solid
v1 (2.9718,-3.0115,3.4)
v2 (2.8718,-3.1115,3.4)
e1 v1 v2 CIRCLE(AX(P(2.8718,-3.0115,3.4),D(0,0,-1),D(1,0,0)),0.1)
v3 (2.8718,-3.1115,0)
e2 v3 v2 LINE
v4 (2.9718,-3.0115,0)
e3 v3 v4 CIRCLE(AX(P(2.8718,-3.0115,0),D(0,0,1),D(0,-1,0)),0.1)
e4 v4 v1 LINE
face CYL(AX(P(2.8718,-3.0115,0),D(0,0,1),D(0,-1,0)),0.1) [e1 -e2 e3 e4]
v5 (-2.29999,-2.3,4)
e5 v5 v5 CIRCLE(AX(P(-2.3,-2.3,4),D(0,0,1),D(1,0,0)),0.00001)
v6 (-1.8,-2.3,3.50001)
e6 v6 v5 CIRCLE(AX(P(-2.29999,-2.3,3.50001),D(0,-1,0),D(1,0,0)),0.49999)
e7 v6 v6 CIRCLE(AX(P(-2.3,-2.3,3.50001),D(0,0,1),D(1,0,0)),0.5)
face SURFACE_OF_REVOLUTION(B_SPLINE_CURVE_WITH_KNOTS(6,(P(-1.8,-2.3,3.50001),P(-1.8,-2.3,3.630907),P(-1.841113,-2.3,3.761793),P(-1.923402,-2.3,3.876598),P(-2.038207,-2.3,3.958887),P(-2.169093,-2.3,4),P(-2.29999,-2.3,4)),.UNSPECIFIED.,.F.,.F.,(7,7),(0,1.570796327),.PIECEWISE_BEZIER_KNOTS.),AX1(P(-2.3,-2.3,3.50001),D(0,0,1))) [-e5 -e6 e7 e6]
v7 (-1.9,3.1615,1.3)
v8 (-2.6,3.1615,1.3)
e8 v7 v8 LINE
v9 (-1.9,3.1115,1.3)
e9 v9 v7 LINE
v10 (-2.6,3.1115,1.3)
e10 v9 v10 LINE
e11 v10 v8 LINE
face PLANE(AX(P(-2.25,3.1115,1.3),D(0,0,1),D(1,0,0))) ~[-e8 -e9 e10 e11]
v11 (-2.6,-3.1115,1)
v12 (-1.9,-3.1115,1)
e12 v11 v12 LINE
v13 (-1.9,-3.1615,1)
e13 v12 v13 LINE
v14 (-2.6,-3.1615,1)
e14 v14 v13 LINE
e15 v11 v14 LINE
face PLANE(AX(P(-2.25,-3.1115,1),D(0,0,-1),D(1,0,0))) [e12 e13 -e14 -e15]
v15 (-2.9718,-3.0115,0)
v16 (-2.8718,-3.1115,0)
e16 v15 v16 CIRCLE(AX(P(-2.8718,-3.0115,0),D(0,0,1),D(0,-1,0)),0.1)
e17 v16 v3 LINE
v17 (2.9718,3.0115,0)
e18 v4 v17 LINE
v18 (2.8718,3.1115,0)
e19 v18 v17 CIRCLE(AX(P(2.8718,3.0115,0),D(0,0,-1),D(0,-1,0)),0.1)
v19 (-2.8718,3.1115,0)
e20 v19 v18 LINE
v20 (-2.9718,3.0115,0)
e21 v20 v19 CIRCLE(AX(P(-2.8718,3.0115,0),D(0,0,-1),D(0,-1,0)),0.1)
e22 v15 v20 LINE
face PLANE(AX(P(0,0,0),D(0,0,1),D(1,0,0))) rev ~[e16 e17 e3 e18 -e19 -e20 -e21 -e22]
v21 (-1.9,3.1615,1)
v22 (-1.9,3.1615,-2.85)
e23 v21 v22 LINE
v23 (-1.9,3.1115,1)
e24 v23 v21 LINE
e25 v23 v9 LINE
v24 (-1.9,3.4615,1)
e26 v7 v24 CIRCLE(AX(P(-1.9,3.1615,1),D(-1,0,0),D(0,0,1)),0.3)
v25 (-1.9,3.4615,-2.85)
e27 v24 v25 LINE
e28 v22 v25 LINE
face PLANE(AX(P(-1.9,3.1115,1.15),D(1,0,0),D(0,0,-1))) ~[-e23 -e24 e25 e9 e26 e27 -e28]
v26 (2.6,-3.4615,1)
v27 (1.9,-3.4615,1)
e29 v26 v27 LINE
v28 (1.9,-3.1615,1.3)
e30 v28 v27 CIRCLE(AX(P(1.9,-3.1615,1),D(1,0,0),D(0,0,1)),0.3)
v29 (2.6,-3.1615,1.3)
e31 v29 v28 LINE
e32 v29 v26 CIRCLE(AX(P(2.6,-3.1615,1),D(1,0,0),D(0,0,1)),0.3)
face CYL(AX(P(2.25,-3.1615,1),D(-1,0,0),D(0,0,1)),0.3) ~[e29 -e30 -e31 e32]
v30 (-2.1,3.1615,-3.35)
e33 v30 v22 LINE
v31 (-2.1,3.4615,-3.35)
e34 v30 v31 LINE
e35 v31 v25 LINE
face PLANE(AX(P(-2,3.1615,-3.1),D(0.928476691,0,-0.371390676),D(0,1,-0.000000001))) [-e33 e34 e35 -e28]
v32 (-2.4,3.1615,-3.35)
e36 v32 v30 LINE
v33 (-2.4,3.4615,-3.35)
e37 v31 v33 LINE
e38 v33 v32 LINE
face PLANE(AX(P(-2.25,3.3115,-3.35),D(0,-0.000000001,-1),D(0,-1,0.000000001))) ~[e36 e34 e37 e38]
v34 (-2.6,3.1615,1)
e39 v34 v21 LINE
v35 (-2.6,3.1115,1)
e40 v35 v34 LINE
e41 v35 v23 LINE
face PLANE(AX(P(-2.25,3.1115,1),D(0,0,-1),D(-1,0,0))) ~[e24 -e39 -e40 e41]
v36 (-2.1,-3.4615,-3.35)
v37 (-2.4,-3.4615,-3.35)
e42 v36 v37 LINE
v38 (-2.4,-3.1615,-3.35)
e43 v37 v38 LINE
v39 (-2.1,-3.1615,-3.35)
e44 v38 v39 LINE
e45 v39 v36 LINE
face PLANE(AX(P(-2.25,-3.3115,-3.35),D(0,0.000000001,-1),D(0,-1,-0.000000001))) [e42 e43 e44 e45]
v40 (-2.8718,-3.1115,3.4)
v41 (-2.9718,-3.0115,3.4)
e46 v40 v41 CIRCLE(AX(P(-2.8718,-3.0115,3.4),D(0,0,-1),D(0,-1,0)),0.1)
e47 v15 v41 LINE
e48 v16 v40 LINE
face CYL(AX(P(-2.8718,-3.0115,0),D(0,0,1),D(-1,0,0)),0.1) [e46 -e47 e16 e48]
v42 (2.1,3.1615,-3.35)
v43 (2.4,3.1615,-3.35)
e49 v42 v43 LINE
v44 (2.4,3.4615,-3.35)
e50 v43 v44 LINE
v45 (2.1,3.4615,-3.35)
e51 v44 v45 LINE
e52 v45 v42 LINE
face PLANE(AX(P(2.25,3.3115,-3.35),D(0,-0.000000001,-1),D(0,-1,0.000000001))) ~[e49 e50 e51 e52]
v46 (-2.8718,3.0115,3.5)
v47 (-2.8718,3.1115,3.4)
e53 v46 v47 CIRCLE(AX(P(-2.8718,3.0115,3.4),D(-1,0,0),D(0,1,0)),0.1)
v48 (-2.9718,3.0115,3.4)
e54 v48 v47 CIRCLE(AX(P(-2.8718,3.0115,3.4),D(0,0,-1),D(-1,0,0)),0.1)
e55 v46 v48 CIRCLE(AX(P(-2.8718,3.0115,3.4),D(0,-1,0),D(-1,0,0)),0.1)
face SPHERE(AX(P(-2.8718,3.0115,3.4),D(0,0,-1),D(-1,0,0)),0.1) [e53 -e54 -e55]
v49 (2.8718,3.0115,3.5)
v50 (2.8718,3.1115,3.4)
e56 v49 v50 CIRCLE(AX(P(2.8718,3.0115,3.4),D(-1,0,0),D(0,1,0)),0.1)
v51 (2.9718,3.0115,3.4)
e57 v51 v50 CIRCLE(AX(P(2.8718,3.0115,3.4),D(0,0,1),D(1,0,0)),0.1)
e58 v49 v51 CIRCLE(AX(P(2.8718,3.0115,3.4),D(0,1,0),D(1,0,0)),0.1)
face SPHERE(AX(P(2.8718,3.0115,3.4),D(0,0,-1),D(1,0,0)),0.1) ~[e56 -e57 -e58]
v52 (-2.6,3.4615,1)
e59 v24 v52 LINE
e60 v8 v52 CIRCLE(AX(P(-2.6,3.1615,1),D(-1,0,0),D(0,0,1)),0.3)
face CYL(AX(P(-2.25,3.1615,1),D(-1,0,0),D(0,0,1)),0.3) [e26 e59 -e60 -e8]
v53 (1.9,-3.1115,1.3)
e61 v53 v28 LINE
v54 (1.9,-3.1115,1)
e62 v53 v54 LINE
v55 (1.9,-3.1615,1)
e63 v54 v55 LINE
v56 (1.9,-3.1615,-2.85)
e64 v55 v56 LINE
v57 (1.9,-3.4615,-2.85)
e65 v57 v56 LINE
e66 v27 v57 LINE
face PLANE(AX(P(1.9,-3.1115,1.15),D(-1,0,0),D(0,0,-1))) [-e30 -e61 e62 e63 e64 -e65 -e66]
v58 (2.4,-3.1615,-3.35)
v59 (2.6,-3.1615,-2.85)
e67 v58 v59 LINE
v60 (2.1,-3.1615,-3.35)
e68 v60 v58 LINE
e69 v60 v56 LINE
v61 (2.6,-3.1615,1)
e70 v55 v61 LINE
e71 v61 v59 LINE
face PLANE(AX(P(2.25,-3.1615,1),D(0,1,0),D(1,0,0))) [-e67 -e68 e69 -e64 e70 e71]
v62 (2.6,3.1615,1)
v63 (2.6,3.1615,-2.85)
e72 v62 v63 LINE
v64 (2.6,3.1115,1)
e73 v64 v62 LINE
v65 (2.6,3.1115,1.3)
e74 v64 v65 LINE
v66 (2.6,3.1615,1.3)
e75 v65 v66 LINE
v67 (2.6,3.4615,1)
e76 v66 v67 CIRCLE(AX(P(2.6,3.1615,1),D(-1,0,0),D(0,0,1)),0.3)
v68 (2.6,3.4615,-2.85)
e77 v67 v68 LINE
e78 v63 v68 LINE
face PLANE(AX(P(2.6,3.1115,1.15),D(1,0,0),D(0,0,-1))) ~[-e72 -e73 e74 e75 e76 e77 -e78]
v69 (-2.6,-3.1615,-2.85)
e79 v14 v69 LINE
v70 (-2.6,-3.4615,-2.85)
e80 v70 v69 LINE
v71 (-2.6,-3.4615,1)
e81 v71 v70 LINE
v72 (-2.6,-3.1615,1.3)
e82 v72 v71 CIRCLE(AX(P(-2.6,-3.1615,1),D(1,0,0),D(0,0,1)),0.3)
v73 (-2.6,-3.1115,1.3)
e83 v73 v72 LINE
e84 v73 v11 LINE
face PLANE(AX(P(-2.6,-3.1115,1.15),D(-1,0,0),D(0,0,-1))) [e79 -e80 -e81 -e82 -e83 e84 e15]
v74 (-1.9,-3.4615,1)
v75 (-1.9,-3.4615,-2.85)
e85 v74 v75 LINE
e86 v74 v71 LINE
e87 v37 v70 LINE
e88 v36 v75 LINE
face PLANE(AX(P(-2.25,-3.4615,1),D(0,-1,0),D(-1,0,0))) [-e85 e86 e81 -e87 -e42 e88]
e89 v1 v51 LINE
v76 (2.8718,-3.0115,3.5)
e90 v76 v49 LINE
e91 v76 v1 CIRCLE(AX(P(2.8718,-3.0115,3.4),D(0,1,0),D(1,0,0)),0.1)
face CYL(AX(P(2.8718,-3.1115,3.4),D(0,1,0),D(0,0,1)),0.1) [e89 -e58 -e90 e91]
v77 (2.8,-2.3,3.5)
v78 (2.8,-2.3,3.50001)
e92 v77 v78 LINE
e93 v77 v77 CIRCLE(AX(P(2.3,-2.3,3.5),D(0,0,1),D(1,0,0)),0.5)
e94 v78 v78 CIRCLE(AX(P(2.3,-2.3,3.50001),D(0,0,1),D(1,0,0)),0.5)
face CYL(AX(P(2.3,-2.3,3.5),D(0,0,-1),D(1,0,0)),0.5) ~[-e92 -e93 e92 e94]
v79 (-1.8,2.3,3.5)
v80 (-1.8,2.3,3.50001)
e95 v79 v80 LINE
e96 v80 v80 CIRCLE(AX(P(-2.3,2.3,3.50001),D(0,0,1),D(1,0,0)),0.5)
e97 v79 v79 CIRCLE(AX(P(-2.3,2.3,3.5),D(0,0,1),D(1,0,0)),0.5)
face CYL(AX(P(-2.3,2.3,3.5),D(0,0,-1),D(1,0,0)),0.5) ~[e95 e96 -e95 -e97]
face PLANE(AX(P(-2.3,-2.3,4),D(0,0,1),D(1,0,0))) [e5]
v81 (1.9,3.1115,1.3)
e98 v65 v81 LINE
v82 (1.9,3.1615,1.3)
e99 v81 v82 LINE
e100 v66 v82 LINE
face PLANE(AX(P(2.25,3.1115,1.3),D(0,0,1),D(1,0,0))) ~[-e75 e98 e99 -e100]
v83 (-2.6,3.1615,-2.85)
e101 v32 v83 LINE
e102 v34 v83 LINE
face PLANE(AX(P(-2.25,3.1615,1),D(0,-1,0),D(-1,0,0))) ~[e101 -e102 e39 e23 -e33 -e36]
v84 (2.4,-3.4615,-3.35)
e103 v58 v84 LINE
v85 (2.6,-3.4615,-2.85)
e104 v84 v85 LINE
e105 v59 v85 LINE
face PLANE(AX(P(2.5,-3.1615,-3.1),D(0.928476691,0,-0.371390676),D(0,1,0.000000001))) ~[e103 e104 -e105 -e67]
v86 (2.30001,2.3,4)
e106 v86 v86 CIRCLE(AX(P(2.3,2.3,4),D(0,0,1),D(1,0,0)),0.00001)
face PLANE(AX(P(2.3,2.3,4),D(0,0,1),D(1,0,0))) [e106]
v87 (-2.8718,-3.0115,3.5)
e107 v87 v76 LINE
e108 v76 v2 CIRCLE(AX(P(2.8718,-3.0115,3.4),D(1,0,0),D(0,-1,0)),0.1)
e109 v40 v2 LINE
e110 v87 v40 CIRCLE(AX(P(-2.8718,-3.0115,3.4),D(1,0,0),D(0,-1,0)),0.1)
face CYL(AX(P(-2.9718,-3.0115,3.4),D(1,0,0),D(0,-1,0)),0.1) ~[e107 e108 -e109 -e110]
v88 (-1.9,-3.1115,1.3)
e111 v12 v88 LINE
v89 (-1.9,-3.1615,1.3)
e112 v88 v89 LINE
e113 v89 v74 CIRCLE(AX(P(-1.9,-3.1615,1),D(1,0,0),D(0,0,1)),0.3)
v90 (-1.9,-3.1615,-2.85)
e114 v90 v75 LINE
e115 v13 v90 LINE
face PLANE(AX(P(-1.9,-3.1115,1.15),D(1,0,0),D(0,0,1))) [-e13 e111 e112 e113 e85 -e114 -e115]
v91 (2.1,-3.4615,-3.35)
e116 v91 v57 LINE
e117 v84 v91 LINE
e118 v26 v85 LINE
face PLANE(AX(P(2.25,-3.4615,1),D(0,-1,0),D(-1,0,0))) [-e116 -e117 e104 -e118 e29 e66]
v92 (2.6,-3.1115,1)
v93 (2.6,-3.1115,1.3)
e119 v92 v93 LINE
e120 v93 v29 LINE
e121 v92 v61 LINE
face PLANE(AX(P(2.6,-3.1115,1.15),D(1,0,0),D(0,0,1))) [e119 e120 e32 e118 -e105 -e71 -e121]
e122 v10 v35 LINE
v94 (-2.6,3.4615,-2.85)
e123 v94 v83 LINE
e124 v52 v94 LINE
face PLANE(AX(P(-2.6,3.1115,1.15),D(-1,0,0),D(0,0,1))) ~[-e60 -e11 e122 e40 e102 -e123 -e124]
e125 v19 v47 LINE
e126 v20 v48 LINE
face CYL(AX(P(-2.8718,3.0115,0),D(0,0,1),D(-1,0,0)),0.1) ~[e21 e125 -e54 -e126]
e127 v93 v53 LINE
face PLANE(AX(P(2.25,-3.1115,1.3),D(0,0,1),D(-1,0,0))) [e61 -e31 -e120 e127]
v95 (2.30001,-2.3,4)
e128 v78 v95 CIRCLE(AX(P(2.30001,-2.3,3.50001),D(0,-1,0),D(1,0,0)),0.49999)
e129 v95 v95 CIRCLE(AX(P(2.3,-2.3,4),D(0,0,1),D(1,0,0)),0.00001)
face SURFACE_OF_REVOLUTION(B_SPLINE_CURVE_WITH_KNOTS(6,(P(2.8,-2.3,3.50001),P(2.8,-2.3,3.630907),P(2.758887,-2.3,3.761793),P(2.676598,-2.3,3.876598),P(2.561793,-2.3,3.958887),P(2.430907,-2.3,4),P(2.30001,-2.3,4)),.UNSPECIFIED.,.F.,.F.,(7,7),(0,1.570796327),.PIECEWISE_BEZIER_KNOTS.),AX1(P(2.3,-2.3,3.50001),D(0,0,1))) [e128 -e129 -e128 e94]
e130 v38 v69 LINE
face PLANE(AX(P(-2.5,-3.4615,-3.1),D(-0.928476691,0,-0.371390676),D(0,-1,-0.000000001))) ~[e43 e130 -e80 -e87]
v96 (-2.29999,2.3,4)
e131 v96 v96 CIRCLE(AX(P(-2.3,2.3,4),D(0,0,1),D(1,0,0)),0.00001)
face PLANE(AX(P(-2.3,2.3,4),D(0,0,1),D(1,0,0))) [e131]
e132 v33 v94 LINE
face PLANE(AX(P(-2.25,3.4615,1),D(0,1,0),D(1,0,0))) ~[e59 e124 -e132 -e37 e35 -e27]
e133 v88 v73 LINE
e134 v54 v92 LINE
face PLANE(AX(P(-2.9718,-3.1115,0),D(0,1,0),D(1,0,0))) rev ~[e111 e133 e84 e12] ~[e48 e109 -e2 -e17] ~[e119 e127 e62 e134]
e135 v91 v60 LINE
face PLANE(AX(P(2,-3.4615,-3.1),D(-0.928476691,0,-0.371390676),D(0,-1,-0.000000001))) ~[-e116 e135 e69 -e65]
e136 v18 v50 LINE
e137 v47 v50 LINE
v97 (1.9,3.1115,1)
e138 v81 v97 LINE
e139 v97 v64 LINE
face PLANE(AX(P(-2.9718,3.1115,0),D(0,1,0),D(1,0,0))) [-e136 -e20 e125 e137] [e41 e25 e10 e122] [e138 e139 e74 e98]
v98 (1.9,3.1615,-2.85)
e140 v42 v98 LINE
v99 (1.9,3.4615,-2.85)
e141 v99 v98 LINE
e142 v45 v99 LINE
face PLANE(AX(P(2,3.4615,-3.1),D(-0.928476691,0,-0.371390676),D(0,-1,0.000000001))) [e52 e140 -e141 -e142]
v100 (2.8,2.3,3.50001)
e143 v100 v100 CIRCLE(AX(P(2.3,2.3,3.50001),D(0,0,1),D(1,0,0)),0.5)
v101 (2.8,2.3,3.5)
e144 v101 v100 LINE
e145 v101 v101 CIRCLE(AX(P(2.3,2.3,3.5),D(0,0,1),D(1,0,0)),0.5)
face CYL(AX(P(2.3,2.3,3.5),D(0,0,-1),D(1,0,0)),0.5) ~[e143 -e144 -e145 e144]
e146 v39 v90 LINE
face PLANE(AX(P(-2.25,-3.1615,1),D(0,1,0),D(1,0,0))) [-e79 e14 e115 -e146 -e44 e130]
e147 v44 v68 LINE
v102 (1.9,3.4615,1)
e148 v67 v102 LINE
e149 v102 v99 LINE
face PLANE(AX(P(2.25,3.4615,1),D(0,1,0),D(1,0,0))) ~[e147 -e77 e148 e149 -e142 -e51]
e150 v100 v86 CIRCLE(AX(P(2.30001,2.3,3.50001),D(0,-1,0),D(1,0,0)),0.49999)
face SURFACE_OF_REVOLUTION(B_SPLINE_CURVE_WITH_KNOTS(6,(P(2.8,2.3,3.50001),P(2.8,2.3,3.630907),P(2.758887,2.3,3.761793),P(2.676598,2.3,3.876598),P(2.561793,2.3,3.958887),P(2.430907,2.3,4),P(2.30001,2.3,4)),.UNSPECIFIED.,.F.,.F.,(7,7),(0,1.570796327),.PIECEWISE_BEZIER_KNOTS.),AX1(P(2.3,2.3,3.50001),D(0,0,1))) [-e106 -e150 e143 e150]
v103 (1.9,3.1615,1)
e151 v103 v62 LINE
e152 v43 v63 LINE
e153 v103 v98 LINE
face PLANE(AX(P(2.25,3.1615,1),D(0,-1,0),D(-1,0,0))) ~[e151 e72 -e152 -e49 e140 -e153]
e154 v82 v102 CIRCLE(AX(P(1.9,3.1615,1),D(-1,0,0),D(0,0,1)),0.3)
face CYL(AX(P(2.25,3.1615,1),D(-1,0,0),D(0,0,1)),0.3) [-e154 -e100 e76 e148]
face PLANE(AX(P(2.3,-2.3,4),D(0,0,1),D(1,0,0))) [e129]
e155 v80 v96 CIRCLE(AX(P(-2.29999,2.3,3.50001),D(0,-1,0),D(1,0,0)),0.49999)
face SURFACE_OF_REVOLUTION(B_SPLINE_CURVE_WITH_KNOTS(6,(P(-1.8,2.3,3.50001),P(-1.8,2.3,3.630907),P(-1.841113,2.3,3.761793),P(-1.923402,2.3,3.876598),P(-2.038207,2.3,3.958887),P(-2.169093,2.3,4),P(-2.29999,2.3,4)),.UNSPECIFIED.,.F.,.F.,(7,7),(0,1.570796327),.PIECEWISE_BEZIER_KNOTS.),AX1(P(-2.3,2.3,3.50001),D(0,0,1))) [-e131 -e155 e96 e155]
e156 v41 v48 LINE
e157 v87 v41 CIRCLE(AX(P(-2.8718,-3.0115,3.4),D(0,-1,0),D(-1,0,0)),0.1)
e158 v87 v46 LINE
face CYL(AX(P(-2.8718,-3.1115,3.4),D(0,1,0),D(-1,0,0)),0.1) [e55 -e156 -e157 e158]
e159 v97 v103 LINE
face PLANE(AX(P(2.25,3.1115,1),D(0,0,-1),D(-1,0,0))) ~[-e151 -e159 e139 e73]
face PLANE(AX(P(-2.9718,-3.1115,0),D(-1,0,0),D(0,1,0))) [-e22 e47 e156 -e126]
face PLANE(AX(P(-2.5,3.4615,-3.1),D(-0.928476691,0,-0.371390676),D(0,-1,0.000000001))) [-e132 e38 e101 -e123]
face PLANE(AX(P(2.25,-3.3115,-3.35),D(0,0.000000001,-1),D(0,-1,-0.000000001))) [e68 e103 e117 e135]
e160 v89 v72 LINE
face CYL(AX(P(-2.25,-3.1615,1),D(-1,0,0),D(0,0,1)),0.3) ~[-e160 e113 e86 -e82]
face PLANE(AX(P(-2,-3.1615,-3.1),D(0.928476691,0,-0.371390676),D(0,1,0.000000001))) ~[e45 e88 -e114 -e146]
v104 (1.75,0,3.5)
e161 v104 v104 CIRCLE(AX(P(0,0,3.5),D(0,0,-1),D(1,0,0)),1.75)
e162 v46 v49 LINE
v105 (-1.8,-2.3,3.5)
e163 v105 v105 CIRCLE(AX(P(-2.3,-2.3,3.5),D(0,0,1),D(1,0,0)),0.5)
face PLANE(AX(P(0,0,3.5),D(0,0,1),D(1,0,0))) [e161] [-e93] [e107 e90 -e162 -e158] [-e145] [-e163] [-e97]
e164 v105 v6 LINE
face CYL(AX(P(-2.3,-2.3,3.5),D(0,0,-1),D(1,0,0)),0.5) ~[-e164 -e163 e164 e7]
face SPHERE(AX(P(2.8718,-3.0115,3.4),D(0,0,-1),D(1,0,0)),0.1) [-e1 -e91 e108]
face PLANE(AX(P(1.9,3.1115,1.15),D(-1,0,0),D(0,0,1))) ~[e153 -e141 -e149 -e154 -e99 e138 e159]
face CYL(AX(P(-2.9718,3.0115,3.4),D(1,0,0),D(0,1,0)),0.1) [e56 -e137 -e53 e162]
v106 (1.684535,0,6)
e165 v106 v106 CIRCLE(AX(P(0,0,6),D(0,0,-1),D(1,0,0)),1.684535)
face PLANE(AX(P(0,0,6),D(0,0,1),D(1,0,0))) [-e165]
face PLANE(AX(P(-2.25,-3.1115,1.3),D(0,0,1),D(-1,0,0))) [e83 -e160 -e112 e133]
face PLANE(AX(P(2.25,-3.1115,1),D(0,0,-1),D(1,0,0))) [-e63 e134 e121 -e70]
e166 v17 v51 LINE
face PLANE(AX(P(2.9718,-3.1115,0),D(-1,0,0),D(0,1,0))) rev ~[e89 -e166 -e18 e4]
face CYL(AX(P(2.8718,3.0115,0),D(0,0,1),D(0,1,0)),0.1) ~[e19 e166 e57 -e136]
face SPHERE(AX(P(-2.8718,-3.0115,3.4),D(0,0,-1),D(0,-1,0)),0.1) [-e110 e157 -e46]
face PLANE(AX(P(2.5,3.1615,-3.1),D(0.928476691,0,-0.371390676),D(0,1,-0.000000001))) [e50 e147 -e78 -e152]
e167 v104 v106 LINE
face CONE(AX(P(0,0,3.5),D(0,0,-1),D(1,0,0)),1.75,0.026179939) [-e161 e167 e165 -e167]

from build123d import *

# Parameters (mm, degrees)
F0_W        = 5.9436
F0_H        = 6.223
F1_DEPTH    = 3.5
F2_R        = 1.75
F3_DEPTH    = 2.5
F3_TAPER    = 1.5
F4_R        = 0.1
F5_R        = 0.5
F6_DEPTH    = 0.5
F7_R        = 0.49999
F8_W        = 0.7
F8_H        = 0.3
F11_SIZE2   = 0.5
F11_SIZE    = 0.2
F11_2_SIZE2 = 0.5
F11_2_SIZE  = 0.2


# Not quite as in the source:
# - a fillet or chamfer is up to 0.001 mm smaller than in the source, because OpenCascade refuses the exact size


with BuildPart() as f1:
    # F0 (on Top) → F1 (new body)
    with BuildSketch(Plane.XY):
        Rectangle(F0_W, F0_H)
    extrude(amount=F1_DEPTH)

    # F2 (on face) → F3 (join)
    with BuildSketch(Plane.XY.offset(3.5)):
        Circle(F2_R)
    extrude(amount=F3_DEPTH, taper=F3_TAPER)

    # F4
    f4_edges = [f1.edges().sort_by_distance(p)[0] for p in [
        (2.9718, -3.1115, 1.75),
        (-2.9718, -3.1115, 1.75),
        (-2.9718, 3.1115, 1.75),
        (2.9718, 3.1115, 1.75),
        (2.9718, 0, 3.5),
        (0, -3.1115, 3.5),
        (-2.9718, 0, 3.5),
        (0, 3.1115, 3.5),
    ]]
    fillet(f4_edges, radius=F4_R)

    # F5 (on face) → F6 (join)
    with BuildSketch(Plane.XY.offset(3.5)):
        with Locations((2.3, -2.3)):
            Circle(F5_R)
        with Locations((2.3, 2.3)):
            Circle(F5_R)
        with Locations((-2.3, 2.3)):
            Circle(F5_R)
        with Locations((-2.3, -2.3)):
            Circle(F5_R)
    extrude(amount=F6_DEPTH)

    # F7 (radius 0.5 in the source; OpenCascade refuses exactly that, so slightly less here)
    f7_edges = [f1.edges().sort_by_distance(p)[0] for p in [
        (1.8, -2.3, 4),
        (1.8, 2.3, 4),
        (-2.8, 2.3, 4),
        (-2.8, -2.3, 4),
    ]]
    fillet(f7_edges, radius=F7_R)

    # F10: sweep along a path in F9
    with BuildLine(Plane.YZ) as f10_path:
        Line((-3.1115, 1.15), (-3.1615, 1.15))
        ThreePointArc((-3.1615, 1.15), (-3.2675660172, 1.1060660172), (-3.3115, 1))
        Line((-3.3115, 1), (-3.3115, -3.35))
    # F8 (on face) → F10 (sweep)
    with BuildSketch(Plane.XZ.offset(3.1115)):
        with Locations((-2.25, 1.15)):
            Rectangle(F8_W, F8_H)
        with Locations((2.25, 1.15)):
            Rectangle(F8_W, F8_H)
    sweep(path=f10_path.line)

    # F11
    f11_edges = [f1.edges().sort_by_distance(p)[0] for p in [
        (-2.6, -3.3115, -3.35),
        (-1.9, -3.3115, -3.35),
    ]]
    f11_side = f1.faces().sort_by_distance((-2.25, -3.3115, -3.35))[0]
    chamfer(f11_edges, length=F11_SIZE, length2=F11_SIZE2, reference=f11_side)

    # F11#2
    f11_2_edges = [f1.edges().sort_by_distance(p)[0] for p in [
        (1.9, -3.3115, -3.35),
        (2.6, -3.3115, -3.35),
    ]]
    f11_2_side = f1.faces().sort_by_distance((2.25, -3.3115, -3.35))[0]
    chamfer(f11_2_edges, length=F11_2_SIZE, length2=F11_2_SIZE2, reference=f11_2_side)

    # F12: F1 across plane


with BuildPart() as f1_1:
    add(f1.part)
    add(f1.part.mirror(Plane.XZ))


solid = f1_1.part
